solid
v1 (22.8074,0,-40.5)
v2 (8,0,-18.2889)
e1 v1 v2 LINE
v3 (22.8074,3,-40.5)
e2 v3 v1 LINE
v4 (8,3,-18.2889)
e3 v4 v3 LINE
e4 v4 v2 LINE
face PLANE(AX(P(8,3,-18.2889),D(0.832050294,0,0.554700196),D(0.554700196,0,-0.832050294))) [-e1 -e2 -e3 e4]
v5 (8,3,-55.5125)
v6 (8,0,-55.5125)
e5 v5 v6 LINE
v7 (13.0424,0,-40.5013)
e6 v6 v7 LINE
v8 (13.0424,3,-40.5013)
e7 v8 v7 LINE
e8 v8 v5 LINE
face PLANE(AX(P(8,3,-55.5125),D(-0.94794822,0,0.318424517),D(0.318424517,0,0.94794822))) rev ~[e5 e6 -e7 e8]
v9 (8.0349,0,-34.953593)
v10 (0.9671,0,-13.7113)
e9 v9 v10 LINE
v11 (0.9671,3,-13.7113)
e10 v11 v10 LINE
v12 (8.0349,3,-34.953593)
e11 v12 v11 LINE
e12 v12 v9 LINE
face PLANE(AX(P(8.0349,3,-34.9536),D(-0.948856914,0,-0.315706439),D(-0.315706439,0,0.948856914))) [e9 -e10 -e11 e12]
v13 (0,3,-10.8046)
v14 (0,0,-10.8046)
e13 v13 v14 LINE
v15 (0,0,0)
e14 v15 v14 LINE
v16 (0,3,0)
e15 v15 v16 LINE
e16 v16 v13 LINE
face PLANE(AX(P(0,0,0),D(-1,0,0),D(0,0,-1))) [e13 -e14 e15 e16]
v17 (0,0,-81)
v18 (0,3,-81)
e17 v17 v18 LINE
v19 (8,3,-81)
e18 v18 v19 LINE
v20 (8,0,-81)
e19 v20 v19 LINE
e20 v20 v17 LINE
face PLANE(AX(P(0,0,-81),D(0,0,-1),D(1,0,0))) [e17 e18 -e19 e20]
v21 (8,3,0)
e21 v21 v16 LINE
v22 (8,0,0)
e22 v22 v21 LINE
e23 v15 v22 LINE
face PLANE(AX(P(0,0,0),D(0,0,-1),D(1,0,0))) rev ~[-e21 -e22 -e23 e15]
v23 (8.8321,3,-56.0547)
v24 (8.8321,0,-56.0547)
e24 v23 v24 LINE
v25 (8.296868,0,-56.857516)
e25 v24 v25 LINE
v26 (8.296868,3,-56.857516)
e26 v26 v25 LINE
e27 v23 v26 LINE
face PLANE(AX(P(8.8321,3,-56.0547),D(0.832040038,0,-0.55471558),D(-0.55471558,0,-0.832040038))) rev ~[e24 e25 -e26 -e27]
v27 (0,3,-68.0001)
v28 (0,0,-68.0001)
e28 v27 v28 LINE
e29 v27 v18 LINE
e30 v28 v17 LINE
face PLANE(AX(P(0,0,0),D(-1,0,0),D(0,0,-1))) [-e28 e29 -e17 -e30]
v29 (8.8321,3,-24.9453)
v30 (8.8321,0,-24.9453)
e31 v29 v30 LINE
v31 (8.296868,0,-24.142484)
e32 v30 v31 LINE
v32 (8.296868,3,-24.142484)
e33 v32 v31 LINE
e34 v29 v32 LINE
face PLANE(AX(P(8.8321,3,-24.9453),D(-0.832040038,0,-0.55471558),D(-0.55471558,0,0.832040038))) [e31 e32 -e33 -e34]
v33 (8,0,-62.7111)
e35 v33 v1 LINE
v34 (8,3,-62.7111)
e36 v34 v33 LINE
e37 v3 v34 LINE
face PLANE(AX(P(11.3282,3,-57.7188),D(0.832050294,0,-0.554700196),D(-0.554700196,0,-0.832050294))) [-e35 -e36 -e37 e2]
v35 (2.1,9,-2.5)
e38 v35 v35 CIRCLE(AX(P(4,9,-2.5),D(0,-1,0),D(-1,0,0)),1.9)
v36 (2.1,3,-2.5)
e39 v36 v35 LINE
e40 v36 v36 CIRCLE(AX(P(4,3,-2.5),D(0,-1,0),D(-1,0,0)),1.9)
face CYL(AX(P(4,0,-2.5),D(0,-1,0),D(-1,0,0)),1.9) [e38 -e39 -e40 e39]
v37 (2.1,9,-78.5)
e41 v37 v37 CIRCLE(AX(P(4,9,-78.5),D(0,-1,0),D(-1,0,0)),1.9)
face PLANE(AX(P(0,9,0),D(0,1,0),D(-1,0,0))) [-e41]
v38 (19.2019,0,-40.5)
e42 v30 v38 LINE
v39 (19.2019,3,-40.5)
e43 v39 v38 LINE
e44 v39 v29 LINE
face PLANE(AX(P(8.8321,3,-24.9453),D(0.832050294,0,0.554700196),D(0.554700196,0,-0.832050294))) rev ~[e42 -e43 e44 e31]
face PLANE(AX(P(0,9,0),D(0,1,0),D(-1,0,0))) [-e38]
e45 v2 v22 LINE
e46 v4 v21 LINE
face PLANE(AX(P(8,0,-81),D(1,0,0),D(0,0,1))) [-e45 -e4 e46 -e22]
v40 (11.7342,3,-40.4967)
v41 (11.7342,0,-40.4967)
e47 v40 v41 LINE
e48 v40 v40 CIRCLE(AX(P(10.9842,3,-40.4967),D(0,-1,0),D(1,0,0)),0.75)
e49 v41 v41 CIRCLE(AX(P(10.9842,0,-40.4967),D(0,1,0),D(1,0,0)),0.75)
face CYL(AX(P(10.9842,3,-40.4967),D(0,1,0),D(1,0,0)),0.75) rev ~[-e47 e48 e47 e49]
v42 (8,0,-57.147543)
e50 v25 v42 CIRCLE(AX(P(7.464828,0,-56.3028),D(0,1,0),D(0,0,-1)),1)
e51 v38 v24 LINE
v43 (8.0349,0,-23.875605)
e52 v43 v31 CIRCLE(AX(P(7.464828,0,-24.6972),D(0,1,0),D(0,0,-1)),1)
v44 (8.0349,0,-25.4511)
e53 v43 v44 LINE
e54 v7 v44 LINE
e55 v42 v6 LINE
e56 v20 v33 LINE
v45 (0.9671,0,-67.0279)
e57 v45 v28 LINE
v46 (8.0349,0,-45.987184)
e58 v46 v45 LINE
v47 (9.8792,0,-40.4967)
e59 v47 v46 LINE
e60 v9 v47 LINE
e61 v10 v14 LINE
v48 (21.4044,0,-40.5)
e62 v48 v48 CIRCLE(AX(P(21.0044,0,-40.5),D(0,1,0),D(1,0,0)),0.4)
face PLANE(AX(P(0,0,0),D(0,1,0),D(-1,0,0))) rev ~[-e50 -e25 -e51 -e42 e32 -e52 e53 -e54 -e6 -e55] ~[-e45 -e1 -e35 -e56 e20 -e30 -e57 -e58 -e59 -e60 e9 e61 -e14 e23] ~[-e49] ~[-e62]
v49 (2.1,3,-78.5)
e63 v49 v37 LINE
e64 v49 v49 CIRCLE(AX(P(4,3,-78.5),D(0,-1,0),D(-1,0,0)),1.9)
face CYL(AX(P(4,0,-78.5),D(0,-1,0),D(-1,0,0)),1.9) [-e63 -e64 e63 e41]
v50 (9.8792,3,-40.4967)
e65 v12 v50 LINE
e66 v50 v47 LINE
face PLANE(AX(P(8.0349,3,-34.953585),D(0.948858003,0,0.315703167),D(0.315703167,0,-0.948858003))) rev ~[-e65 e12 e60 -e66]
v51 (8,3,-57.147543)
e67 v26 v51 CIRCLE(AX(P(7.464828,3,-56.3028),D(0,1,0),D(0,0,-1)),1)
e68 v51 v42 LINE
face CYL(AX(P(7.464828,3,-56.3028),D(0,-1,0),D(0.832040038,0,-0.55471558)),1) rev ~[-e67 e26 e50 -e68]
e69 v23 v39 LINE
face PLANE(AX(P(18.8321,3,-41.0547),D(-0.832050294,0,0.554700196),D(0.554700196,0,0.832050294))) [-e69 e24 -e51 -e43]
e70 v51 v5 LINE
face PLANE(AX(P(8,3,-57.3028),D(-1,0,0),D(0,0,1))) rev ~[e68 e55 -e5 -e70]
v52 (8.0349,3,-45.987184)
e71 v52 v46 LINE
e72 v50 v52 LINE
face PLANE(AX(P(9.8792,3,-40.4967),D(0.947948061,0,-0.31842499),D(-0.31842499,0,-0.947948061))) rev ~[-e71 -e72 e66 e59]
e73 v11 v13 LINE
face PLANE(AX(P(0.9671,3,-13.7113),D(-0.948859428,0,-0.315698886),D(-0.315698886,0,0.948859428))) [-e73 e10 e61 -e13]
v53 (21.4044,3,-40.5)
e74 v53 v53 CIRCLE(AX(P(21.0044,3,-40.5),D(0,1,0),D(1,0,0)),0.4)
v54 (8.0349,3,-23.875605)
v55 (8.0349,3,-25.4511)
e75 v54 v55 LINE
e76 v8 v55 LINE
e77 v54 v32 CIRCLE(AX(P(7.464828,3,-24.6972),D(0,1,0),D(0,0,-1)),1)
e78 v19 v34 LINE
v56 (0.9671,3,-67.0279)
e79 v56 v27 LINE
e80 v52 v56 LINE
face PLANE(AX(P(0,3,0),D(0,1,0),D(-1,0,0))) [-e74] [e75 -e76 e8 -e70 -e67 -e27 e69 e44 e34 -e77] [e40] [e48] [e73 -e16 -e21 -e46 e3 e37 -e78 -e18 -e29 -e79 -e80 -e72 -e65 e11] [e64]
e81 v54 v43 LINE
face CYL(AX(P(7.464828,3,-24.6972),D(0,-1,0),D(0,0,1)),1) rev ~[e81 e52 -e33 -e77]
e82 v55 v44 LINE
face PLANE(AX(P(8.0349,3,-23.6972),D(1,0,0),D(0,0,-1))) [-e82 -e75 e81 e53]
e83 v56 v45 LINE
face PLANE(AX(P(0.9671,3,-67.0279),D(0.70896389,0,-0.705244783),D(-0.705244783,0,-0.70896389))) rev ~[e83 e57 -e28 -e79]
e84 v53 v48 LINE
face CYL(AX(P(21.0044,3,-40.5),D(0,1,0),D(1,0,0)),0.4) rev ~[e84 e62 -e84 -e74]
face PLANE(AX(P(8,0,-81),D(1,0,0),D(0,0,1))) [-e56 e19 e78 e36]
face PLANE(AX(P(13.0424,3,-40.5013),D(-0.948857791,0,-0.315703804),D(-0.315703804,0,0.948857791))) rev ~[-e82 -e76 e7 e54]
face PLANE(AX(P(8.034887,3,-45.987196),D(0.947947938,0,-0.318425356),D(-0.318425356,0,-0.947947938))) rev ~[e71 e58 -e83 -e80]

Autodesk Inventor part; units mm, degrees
ref_plane "YZ Plane" through (0, 0, 0) normal (1, 0, 0) x (0, 1, 0)
ref_plane "XZ Plane" through (0, 0, 0) normal (0, 1, 0) x (-1, 0, 0)
ref_plane "XY Plane" through (0, 0, 0) normal (0, 0, 1) x (1, 0, 0)
sketch "Sketch1" plane through (0, 0, 0) normal (0, 1, 0) x (-1, 0, 0)
  line L0 (0, 0) -> (0, -81)
  line L1 (0, -81) -> (-8, -81)
  line L2 (-8, -81) -> (-8, 0)
  line L3 (0, 0) -> (-8, 0)
  line L4 (-4, 0) -> (-4, -2.5)
  line L5 (-4, -81) -> (-4, -78.5)
  circle A0 centre (-4, -2.5) radius 1.9
  circle A1 centre (-4, -78.5) radius 1.9
  dimension "d0" = 81
  dimension "d1" = 8
  dimension "d2" = 81
  dimension "d3" = 2.5
  dimension "d4" = 2.5
  dimension "d5" = 3.8
  dimension "d6" = 3.8
extrude "Extrusion1" add sketch "Sketch1" along normal blind 3
extrude "Extrusion2" add sketch "Sketch1" along normal blind 9 contours A0 | A1
sketch "Sketch2" plane through (0, 3, 0) normal (0, 1, 0) x (1, 0, 0)
  line L0 (8, 0) -> (8, 81) projected
  line L1 (8, 40.5) -> (18, 40.5)
  line L2 (8, 40.5) -> (8, 25.5)
  line L3 (8, 25.5) -> (0, 25.5)
  line L4 (0, 81) -> (0, 0) projected
  line L5 (8, 40.5) -> (8, 55.5)
  line L6 (8, 55.5) -> (0, 55.5)
  line L7 (0, 55.5) -> (0, 25.5)
  line L8 (8, 25.5) -> (18, 40.5)
  line L9 (8, 55.5) -> (18, 40.5)
  line L10 (8.8321, 24.9453) -> (18.8321, 39.9453)
  line L11 (8.8321, 56.0547) -> (18.8321, 41.0547)
  line L12 (8.8321, 24.9453) -> (8, 23.6972)
  line L13 (8, 23.6972) -> (8, 25.5)
  line L14 (8, 55.5) -> (8, 57.3028)
  line L15 (8.8321, 56.0547) -> (8, 57.3028)
  line L16 (18.8321, 39.9453) -> (19.2019, 40.5)
  line L17 (18.8321, 41.0547) -> (19.2019, 40.5)
  line L18 (5, 25.5) -> (5, 13.7889)
  line L19 (5, 13.7889) -> (11.3282, 23.2812)
  line L20 (11.3282, 23.2812) -> (21.3282, 38.2812)
  line L21 (21.3282, 38.2812) -> (22.8074, 40.5)
  line L22 (22.8074, 40.5) -> (21.3282, 42.7188)
  line L23 (21.3282, 42.7188) -> (11.3282, 57.7188)
  line L24 (11.3282, 57.7188) -> (5, 67.2111)
  line L25 (5, 67.2111) -> (5, 55.5)
  line L26 (8, 23.6972) -> (0, 23.6972)
  line L27 (0, 25.5) -> (0, 23.6972)
  line L28 (8, 57.3028) -> (0, 57.3028)
  line L29 (0, 57.3028) -> (0, 55.5)
  point P0 (8, 18.2889)
  point P1 (8, 62.7111)
  dimension "d11" = 10
  dimension "d12" = 15
  dimension "d13" = 15
  dimension "d14" = 1
  dimension "d15" = 1
  dimension "d16" = 3
extrude "Extrusion3" add sketch "Sketch2" against normal blind 3 contours L12 L10 L16 L17 L11 L15 L0 L24 L23 L22 L21 L20 L19
extrude "Extrusion4" cut sketch "Sketch2" against normal blind 3 contours L26 L18 L3 L0 | L3 L4 L6 L0 | L26 L4 L3 L18 | L6 L25 L28 L0 | L6 L4 L28 L25
chamfer "Chamfer1" distance 3 angle 45 2 edges at (0, 1.5, -57.3028) (0, 1.5, -23.6972)
fillet "Fillet1" radius 1 2 edges at (8, 1.5, -57.3028) (8, 1.5, -23.6972)
sketch "Sketch3" plane through (0, 3, 0) normal (0, 1, 0) x (1, 0, 0)
  line L0 (22.8074, 40.5) -> (8, 62.7111) projected
  line L1 (22.8074, 40.5) -> (21.0044, 40.5)
  circle A0 centre (21.0044, 40.5) radius 0.4
  point P0 (0, 0)
  dimension "d25" = 1.803
  dimension "d26" = 0.8
extrude "Extrusion5" cut sketch "Sketch3" against normal blind 3
sketch "Sketch4" plane through (0, 3, 0) normal (0, 1, 0) x (1, 0, 0)
  line L0 (0, 57.3028) -> (8.0349, 57.3028)
  line L1 (0, 57.3028) -> (0, 23.6972)
  line L2 (0, 23.6972) -> (8.0349, 23.6972)
  line L3 (8.0349, 23.6972) -> (8.0349, 57.3028)
  line L4 (0, 60.3028) -> (3, 57.3028) projected
  line L5 (0, 57.3028) -> (0, 60.3028)
  line L6 (0, 60.3028) -> (3, 57.3028)
  line L7 (0, 20.6972) -> (0, 0) projected
  line L8 (0, 20.6972) -> (0, 23.6972)
  line L9 (0, 20.6972) -> (3, 23.6972)
  line L10 (0, 57.3028) -> (8, 57.3028)
  line L11 (8, 57.3028) -> (8, 55.5125)
  line L12 (8, 55.5125) -> (0, 55.5125)
  line L13 (0, 55.5125) -> (0, 57.3028)
  line L14 (8, 55.5125) -> (13.0424, 40.5013)
  line L15 (13.0424, 40.5013) -> (8.0349, 25.4511)
  line L16 (4.5889, 24.5965) -> (9.8792, 40.4967)
  line L17 (9.8792, 40.4967) -> (4.5467, 56.3715)
  circle A0 centre (10.9842, 40.4967) radius 0.75
  line L18 (9.8792, 40.4967) -> (8.0349, 40.5)
  line L19 (9.8792, 40.4967) -> (10.9842, 40.4967)
  point P0 (8.0349, 45.9872)
  point P1 (8.0349, 34.9536)
  dimension "d29" = 8
  dimension "d30" = 3
  dimension "d31" = 1.5
  dimension "d36" = 1.8443
  dimension "d37" = 1.105
extrude "Extrusion6" add sketch "Sketch4" against normal blind 3 contours L5 L4 L0 | L0 L11 L12 L1 | L12 L17 L3 L2 L1 | L2 L9 L8 | L12 L14 L3 L17 | L3 L14 L15 L16 L17
sketch "Sketch5" plane through (0, 3, 0) normal (0, 1, 0) x (1, 0, 0)
  line L0 (8.0349, 45.9872) -> (8.0349, 34.9536) projected
  line L1 (8.0349, 34.9536) -> (0.9671, 13.7113)
  line L2 (9.8792, 40.4967) -> (8.0349, 34.9536) projected
  line L3 (9.8792, 40.4967) -> (8.0349, 45.9872) projected
  line L4 (9.8792, 40.4967) -> (0.9671, 67.0279)
  line L5 (0.9671, 67.0279) -> (0.9671, 13.7113)
  line L6 (0, 81) -> (0, 0) projected
  line L7 (8.0349, 45.9872) -> (8.0349, 34.9536)
  point P0 (8.0349, 45.9872)
extrude "Extrusion7" cut sketch "Sketch5" against normal blind 3 contours L0 L1 L5 L4
sketch "Sketch6" plane through (0, 3, 0) normal (0, 1, 0) x (1, 0, 0)
  line L0 (9.8792, 40.4967) -> (0.9671, 67.0279) projected
  line L1 (0.9671, 67.0279) -> (0, 68.0001)
  line L2 (0, 81) -> (0, 0) projected
  line L3 (9.8792, 40.4967) -> (0.9671, 13.7113) projected
  line L4 (0.9671, 13.7113) -> (0, 10.8046)
  line L5 (0.9671, 13.7113) -> (0.9671, 67.0279)
  line L6 (0, 68.0001) -> (0, 10.8046)
  point P0 (0, 63.7751)
  point P1 (0, 17.0581)
extrude "Extrusion8" cut sketch "Sketch6" against normal blind 3 contours L5 L4 L2 L1
properties part number "SteeringBaru"
